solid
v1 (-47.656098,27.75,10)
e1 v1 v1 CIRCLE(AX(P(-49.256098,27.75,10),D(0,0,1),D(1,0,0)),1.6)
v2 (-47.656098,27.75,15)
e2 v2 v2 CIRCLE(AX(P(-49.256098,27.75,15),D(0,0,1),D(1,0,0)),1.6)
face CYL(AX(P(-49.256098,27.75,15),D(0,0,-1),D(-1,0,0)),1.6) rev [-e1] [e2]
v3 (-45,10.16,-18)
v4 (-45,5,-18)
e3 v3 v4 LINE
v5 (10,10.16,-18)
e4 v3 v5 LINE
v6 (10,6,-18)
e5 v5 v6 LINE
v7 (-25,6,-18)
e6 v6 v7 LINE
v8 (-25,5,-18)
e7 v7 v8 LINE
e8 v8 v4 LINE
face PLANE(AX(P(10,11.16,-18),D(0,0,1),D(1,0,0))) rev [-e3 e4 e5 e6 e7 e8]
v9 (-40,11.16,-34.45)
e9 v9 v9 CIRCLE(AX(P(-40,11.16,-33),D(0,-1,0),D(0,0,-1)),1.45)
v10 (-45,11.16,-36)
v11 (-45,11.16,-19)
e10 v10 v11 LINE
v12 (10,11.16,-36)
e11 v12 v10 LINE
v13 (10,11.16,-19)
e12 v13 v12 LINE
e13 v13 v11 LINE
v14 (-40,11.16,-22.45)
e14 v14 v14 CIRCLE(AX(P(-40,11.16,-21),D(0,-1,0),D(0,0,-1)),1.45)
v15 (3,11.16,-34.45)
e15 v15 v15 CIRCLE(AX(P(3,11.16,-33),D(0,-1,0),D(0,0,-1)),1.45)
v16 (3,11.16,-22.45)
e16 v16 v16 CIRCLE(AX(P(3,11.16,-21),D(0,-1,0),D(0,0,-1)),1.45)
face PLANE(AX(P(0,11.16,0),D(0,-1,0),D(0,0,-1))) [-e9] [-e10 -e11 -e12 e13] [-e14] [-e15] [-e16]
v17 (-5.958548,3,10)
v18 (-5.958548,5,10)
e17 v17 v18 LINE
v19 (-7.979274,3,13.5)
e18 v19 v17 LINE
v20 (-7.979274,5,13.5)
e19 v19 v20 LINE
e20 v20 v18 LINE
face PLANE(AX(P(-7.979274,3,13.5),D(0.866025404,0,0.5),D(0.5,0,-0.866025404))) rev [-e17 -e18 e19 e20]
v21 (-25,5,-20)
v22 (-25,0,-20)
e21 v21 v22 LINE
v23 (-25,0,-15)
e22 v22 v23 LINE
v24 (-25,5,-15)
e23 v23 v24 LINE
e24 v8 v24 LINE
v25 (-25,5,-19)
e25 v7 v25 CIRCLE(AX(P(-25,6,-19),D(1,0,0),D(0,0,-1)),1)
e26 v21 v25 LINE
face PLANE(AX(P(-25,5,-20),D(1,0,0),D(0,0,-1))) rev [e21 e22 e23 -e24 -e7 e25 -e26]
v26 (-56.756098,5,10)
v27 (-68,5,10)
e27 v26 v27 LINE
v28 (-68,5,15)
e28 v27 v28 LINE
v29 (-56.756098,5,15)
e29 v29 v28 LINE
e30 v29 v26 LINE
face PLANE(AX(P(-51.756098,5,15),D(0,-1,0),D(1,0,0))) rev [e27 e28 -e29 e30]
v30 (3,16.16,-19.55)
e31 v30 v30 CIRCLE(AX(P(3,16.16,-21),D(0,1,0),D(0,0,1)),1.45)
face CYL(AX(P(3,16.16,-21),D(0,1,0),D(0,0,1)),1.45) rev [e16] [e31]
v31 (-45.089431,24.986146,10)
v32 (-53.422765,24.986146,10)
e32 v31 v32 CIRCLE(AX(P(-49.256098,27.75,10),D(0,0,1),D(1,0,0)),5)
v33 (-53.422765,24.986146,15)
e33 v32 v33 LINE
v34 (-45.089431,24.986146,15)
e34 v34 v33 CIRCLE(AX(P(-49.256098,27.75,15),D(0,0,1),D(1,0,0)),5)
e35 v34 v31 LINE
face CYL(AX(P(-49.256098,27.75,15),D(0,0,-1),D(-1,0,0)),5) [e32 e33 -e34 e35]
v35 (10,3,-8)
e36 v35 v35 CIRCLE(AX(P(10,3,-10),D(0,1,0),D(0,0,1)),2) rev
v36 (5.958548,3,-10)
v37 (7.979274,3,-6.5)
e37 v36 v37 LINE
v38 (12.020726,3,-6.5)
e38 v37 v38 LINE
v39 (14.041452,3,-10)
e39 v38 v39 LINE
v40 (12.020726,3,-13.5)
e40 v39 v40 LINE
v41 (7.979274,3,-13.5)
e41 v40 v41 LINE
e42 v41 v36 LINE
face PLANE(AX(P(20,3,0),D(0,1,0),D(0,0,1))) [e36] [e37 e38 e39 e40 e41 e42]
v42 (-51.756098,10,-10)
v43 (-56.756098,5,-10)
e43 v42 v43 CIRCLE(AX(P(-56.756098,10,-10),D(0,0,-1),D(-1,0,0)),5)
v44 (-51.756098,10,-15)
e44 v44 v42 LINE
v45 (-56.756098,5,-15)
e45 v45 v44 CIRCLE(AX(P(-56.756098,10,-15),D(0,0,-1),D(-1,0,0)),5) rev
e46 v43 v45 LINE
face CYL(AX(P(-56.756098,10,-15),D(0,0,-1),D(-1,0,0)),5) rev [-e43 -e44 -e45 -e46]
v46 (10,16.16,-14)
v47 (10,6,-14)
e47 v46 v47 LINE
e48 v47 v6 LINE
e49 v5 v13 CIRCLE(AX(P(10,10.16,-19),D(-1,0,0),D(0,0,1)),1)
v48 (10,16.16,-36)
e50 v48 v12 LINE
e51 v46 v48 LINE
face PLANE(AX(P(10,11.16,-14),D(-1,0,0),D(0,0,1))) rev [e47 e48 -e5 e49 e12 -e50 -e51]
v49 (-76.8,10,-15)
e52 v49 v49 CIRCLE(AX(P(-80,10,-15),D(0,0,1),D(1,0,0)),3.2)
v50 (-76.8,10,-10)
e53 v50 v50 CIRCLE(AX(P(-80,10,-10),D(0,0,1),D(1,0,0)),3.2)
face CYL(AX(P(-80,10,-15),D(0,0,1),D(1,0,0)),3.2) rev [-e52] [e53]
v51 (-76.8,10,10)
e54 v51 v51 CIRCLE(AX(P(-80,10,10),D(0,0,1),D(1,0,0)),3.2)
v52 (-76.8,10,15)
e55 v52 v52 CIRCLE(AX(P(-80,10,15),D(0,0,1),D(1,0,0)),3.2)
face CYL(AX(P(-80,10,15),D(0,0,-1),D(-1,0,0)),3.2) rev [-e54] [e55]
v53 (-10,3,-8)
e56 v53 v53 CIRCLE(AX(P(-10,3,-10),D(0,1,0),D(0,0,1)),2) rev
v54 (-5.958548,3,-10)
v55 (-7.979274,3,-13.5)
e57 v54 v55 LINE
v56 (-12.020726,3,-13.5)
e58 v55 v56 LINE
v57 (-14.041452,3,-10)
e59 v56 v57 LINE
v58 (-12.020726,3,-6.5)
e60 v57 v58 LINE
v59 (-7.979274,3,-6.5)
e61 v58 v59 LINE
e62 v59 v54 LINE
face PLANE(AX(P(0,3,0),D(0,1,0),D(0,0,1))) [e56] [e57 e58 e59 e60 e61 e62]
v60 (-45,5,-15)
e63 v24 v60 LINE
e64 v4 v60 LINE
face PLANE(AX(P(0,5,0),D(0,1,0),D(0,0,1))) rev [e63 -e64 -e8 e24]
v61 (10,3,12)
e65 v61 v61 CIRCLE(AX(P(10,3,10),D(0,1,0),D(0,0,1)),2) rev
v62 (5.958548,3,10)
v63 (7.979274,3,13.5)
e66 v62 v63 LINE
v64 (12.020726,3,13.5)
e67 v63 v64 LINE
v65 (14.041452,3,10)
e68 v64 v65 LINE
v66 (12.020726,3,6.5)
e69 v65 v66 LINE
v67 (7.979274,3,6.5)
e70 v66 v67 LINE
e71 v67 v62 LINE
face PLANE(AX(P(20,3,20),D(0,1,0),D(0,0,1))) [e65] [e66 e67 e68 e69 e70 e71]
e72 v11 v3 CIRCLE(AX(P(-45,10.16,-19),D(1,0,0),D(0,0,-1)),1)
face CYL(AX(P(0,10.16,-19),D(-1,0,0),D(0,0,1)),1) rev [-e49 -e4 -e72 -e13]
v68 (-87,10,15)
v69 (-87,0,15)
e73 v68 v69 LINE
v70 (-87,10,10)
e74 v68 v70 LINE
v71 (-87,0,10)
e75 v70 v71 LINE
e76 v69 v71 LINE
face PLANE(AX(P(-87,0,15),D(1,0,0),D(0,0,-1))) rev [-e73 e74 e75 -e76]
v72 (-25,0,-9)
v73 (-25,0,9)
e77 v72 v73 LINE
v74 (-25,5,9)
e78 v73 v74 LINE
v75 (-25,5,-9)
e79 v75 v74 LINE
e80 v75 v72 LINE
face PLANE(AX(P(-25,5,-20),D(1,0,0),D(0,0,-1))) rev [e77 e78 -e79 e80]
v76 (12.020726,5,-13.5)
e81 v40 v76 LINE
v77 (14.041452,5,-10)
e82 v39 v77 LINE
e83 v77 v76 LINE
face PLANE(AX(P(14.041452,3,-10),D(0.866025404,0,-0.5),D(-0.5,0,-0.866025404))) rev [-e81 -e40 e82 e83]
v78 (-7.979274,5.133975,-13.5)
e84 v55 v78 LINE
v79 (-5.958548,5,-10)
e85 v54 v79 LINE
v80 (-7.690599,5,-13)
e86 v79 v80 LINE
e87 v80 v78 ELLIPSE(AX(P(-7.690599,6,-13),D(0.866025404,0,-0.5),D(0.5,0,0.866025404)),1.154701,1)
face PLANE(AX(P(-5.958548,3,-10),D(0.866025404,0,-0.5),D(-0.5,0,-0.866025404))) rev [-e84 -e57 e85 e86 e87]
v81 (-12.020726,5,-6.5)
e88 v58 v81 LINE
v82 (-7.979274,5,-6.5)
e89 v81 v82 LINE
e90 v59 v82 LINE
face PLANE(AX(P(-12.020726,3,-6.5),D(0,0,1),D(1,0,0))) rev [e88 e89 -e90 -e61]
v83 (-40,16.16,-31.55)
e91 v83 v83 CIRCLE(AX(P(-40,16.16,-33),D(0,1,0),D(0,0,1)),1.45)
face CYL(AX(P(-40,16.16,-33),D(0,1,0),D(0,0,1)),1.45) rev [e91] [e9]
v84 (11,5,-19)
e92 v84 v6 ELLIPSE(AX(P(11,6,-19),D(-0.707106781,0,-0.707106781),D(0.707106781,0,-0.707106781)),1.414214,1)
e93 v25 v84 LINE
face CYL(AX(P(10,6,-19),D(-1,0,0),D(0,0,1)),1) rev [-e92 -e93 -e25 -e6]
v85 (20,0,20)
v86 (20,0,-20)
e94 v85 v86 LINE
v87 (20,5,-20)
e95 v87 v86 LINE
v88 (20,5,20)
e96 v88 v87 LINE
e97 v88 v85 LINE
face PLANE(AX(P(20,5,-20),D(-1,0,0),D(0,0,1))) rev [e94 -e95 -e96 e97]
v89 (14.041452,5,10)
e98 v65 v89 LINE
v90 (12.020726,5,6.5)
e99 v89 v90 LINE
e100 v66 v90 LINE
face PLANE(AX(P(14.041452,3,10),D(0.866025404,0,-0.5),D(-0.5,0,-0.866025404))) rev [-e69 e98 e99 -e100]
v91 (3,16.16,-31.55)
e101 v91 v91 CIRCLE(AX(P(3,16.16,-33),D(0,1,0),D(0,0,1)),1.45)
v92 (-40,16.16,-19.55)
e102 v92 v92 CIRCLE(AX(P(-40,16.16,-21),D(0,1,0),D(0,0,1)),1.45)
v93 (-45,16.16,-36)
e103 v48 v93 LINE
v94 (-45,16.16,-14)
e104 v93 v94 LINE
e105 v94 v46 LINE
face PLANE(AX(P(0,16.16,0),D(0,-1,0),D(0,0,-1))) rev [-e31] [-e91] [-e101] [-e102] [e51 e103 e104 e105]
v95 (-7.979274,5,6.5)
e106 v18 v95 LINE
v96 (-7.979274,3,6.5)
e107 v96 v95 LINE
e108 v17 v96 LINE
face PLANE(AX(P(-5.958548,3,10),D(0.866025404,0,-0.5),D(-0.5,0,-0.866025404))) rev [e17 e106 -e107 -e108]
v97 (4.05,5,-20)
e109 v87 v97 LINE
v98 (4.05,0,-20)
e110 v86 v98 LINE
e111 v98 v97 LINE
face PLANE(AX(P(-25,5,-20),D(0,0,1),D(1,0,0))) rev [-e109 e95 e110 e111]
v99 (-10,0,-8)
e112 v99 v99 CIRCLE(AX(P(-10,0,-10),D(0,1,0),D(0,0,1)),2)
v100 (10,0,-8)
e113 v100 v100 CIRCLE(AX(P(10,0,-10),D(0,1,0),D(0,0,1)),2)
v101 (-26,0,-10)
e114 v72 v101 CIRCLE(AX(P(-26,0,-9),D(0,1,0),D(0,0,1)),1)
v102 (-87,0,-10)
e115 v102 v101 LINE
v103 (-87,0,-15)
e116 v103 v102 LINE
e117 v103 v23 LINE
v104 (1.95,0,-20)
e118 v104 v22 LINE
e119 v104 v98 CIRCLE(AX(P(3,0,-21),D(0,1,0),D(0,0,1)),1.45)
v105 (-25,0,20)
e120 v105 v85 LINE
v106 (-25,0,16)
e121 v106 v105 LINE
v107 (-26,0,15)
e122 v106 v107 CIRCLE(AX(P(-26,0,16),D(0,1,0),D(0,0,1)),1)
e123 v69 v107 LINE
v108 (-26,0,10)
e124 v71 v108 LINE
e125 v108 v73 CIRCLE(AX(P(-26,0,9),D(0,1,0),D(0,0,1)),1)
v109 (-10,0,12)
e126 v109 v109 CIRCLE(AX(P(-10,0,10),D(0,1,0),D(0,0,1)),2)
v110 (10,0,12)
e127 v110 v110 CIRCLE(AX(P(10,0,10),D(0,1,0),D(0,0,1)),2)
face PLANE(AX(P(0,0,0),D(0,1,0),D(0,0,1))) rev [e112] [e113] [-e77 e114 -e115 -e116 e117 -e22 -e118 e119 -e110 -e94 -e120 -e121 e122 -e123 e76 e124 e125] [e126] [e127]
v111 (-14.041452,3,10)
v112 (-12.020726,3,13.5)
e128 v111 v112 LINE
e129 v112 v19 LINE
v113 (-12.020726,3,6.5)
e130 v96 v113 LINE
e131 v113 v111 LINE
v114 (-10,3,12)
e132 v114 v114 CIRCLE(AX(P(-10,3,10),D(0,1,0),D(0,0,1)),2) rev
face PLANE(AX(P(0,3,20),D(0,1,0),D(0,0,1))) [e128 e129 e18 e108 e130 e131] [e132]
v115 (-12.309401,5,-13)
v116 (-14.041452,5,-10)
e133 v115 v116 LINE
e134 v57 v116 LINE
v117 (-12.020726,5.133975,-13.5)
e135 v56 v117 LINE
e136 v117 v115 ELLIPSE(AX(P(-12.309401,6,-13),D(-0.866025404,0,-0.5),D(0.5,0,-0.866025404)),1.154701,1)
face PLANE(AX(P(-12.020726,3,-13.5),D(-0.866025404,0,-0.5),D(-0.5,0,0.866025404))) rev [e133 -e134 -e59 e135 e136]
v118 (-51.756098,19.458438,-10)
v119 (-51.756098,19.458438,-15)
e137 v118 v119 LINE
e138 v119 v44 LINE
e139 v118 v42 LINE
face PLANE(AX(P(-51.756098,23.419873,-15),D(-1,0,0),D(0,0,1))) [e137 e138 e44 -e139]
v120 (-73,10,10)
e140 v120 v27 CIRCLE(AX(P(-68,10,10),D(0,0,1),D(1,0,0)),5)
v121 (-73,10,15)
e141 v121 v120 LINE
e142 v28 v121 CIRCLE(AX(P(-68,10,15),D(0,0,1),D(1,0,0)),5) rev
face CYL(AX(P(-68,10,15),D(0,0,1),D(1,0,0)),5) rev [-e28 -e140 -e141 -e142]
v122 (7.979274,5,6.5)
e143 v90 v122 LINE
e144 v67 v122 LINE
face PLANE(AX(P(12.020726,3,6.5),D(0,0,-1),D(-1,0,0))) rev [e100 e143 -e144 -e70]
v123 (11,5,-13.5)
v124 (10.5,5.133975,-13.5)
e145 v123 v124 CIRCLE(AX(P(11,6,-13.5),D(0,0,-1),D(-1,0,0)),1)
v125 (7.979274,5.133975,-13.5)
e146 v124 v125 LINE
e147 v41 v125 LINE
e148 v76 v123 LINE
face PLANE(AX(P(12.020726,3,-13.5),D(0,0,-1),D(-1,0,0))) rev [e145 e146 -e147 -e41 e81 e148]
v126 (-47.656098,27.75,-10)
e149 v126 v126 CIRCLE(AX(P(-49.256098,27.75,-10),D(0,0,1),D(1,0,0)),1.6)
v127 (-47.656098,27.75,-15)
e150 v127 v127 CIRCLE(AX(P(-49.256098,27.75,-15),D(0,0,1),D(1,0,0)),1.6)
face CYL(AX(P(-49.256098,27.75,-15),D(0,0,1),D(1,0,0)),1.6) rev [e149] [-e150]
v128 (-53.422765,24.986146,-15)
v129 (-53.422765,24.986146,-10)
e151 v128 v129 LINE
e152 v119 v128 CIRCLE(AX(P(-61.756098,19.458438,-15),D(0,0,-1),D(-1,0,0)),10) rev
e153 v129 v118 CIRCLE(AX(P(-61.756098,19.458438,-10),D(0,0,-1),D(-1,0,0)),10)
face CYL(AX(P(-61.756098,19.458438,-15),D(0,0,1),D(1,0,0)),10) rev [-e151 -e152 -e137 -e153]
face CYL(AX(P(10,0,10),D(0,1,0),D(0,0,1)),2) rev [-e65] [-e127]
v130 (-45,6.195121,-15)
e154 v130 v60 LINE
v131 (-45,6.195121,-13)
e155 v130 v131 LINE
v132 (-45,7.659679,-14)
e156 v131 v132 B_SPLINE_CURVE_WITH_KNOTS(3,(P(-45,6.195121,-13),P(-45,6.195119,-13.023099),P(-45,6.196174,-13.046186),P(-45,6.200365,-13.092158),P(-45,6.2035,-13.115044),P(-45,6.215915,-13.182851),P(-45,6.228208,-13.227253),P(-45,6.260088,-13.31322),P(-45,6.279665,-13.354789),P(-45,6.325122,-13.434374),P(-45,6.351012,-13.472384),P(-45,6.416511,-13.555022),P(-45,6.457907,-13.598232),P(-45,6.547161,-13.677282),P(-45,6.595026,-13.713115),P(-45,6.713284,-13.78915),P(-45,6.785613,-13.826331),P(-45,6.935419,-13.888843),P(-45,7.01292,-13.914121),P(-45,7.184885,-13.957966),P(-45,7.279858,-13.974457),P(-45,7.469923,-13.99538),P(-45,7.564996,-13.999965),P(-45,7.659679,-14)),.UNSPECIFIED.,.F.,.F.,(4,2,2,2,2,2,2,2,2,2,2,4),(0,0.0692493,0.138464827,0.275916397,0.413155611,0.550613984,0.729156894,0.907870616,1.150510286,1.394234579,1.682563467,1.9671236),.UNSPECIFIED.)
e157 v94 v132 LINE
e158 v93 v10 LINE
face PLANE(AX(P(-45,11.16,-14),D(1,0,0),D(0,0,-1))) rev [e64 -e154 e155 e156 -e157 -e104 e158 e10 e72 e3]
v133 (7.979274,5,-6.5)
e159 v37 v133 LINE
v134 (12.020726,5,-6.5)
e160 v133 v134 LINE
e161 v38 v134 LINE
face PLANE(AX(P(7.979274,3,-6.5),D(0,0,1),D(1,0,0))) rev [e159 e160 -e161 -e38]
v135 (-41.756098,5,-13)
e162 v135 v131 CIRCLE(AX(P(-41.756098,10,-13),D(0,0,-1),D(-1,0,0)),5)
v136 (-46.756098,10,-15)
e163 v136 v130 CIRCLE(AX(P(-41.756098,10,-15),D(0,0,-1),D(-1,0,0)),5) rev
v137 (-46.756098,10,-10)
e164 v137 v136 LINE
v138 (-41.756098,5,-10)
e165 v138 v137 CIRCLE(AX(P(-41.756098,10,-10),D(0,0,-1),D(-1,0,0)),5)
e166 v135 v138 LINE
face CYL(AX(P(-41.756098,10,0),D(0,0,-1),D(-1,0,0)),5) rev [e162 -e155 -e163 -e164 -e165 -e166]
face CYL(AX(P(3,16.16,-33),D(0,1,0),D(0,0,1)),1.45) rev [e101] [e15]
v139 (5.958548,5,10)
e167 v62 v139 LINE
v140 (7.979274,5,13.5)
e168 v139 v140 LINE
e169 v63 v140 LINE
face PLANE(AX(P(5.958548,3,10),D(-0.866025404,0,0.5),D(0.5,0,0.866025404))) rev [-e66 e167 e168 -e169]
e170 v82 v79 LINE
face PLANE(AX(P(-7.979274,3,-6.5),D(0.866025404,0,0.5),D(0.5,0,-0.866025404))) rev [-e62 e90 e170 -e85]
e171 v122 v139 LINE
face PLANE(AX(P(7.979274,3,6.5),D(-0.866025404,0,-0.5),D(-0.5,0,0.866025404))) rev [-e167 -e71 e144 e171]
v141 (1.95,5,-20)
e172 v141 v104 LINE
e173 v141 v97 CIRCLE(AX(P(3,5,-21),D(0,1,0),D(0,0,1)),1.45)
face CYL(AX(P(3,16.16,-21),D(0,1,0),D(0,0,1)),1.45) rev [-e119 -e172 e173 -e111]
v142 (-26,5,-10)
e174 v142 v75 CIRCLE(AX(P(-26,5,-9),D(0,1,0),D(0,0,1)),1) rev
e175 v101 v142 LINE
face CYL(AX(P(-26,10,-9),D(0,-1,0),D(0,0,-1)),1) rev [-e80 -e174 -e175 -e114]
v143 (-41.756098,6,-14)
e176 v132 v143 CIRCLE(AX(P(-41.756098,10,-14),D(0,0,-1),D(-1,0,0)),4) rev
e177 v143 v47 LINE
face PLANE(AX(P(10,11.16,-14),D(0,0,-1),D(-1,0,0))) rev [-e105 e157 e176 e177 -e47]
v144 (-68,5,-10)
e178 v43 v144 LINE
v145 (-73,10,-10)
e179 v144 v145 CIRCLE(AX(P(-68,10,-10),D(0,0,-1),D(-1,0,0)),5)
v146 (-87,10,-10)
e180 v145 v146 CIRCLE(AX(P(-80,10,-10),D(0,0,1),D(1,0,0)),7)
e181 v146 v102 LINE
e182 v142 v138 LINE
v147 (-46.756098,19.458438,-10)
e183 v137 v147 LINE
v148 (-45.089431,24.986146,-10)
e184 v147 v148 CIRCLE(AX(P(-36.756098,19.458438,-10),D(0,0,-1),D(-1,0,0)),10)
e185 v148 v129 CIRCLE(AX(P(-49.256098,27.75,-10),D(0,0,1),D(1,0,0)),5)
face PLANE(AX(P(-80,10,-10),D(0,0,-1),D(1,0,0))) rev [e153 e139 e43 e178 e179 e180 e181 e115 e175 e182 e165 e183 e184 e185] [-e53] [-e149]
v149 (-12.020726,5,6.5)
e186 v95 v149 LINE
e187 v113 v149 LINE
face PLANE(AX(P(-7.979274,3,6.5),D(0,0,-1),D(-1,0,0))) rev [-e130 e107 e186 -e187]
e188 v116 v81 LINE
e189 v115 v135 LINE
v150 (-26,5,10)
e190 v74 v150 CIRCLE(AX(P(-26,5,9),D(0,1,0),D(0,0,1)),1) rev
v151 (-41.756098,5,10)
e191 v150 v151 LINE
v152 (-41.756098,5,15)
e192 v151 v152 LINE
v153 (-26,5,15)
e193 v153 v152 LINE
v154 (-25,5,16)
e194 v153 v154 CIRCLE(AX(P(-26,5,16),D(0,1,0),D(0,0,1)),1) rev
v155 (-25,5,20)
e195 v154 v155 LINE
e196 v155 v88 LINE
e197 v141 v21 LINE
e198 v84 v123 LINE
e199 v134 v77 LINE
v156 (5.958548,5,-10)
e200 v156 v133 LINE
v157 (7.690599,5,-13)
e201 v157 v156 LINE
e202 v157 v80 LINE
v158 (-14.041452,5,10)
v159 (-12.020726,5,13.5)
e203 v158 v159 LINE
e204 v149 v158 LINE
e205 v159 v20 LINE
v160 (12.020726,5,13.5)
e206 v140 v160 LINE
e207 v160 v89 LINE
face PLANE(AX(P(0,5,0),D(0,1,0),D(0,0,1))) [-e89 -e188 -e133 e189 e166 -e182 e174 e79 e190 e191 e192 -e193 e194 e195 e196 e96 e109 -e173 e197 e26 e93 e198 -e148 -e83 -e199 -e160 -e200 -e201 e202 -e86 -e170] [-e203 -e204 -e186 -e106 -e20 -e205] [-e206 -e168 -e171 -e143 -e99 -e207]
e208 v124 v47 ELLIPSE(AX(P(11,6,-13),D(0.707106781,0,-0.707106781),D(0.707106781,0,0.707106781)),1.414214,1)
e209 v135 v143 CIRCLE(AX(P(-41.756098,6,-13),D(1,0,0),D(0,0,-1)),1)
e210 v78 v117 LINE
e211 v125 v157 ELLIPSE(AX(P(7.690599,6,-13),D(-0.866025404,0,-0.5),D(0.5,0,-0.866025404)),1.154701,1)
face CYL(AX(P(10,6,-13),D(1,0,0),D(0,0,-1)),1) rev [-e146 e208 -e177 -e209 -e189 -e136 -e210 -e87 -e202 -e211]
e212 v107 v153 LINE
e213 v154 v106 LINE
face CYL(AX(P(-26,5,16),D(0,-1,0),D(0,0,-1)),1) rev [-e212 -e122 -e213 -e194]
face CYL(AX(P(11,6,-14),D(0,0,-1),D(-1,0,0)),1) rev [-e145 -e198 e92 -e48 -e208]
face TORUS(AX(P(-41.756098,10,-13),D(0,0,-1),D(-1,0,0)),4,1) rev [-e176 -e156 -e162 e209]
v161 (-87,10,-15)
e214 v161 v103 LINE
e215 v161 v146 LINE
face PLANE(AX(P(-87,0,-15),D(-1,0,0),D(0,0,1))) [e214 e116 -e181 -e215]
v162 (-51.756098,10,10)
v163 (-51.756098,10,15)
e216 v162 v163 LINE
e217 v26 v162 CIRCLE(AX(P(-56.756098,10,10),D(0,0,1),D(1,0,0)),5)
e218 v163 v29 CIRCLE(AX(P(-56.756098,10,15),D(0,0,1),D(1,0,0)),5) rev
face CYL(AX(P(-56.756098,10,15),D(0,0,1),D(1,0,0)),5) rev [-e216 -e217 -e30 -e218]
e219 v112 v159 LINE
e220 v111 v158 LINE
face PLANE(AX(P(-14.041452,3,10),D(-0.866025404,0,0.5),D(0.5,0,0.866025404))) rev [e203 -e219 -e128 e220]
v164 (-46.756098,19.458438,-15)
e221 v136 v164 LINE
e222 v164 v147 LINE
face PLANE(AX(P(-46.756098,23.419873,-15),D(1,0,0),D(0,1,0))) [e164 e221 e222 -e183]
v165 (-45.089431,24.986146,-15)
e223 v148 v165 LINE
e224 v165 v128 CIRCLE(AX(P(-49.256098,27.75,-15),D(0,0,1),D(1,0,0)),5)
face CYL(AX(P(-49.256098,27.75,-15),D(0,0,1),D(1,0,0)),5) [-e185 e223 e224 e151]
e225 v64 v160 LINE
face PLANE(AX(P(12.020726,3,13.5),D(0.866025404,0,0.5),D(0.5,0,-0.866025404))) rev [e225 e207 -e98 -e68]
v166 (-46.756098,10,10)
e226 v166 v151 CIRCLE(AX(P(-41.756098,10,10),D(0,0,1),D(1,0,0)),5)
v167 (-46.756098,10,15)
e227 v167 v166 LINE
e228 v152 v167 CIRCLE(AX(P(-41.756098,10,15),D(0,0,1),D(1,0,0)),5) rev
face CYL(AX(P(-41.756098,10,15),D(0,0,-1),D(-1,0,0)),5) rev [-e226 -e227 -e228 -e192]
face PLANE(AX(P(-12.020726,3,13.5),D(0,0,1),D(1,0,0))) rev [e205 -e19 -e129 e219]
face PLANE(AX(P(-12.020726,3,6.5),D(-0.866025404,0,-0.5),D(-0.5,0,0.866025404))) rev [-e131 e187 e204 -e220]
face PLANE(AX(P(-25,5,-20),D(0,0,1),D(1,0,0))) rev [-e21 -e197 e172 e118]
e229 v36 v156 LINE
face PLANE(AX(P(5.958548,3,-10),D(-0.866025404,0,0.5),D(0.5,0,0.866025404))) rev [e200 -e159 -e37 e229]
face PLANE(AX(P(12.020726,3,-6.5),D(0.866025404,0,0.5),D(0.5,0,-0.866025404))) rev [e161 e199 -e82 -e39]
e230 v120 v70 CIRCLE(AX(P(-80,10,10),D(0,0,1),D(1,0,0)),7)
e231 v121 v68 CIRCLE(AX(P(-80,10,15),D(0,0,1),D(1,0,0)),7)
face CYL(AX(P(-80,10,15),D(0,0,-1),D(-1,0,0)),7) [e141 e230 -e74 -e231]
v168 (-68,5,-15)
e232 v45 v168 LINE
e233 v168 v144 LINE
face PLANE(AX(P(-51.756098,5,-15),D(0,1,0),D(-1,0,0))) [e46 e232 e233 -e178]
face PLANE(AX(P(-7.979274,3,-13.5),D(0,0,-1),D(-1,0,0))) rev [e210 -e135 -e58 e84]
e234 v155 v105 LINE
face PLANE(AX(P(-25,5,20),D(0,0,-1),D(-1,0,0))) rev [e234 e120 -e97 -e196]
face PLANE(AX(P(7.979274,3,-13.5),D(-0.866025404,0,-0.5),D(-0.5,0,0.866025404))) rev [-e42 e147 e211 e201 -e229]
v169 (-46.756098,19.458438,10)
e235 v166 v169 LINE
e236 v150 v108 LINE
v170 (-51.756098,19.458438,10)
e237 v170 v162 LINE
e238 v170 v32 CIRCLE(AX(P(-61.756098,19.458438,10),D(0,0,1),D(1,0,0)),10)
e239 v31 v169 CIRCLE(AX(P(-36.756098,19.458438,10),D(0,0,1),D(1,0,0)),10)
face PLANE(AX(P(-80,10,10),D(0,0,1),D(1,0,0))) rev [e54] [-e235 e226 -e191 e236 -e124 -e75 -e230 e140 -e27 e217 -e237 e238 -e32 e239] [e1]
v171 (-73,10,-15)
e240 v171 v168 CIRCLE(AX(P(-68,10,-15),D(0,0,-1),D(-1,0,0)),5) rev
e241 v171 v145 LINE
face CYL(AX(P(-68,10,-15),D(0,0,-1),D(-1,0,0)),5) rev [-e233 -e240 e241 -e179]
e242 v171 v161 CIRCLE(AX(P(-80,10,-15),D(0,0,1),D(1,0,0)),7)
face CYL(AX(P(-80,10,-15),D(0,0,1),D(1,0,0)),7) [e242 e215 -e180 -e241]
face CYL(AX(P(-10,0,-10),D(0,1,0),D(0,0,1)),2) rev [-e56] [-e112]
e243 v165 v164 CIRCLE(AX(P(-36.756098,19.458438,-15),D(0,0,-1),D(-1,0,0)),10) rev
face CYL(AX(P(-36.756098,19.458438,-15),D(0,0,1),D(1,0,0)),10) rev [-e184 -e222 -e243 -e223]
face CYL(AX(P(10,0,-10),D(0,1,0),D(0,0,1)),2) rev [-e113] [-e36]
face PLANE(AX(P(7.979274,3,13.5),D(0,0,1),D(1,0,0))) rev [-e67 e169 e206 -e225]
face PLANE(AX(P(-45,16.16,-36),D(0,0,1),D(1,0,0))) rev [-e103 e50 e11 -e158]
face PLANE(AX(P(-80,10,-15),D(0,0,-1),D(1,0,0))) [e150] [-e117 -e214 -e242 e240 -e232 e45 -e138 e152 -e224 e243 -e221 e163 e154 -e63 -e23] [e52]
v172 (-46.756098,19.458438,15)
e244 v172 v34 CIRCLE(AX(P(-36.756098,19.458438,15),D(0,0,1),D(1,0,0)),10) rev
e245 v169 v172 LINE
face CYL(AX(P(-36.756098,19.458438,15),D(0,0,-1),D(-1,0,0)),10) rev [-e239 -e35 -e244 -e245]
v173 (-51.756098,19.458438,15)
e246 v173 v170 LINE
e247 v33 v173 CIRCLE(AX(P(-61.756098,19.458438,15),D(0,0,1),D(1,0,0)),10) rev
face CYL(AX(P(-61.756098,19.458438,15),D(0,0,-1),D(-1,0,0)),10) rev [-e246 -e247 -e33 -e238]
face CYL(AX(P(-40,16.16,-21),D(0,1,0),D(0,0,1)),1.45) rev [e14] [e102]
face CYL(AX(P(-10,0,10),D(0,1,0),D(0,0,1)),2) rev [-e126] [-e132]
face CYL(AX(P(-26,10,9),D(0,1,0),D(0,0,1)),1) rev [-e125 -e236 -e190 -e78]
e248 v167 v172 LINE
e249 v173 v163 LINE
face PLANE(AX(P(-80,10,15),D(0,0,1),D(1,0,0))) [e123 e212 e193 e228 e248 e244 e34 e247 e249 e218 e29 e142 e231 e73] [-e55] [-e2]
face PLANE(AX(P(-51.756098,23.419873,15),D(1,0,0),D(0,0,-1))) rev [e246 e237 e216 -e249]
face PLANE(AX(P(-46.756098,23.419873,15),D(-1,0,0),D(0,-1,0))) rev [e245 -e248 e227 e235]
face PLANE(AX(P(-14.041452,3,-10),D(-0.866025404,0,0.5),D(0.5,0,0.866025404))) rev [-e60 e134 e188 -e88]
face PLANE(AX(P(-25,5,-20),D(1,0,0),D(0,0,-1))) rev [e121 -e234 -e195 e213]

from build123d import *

# Parameters (mm, degrees)
SKETCH1_W                        = 45
SKETCH1_H                        = 40
CONNECTION_BASE_DEPTH            = 5
SKETCH9_R                        = 3.2
SKETCH9_R_2                      = 1.6
LEFT_LEG_DEPTH                   = 5
LEG_FILLET_R                     = 5
HUB_FILLET_R                     = 10
LEG_FILLET_OF_MIRROR_RIGHT_LEG_R = 5
HUB_FILLET_OF_MIRROR_RIGHT_LEG_R = 10
SKETCH2_R                        = 2
BASE_CONN_HOLE_DEPTH             = 94.482952991
BASE_CONN_NUT_DEPTH              = 2
BASE_HOLES_PATTERN_COUNT         = 2
BASE_HOLES_PATTERN_PITCH         = 20
BASE_HOLES_PATTERN_COUNT_DIR2    = 2
BASE_HOLES_PATTERN_PITCH_DIR2    = 20
SKETCH4_W                        = 55
SKETCH4_H                        = 4
MOTOR_STEP_DEPTH                 = 6.16
SKETCH5_W                        = 55
SKETCH5_H                        = 22
MOTOR_SHELF_DEPTH                = 5
MOTOR_M3_5X0_6_TAPPED_HOLE1_D    = 2.9
SMALL_INTERNAL_FILLETS_R         = 1


# Some blends are built 0.0001 mm under size
with BuildPart() as part:
    # Sketch1 → Connection_Base (new body)
    with BuildSketch(Plane(origin=(0, 0, 0), x_dir=(1, 0, 0), z_dir=(0, 1, 0))):
        with Locations((-2.5, 0)):
            Rectangle(SKETCH1_W, SKETCH1_H)
    extrude(amount=CONNECTION_BASE_DEPTH)

    # Sketch9 → LEFT_LEG (add)
    with BuildSketch(Plane.XY.offset(10)):
        with BuildLine():
            Line((-51.756098166, 5), (-73, 5))
            Line((-73, 5), (-73, 10))
            ThreePointArc((-73, 10), (-80, 17), (-87, 10))
            Line((-87, 10), (-87, 0))
            Line((-87, 0), (0, 0))
            Line((0, 0), (0, 5))
            Line((0, 5), (-46.756098166, 5))
            Line((-46.756098166, 5), (-46.756098166, 23.419872981))
            ThreePointArc((-46.756098166, 23.419872981), (-49.256098166, 32.75), (-51.756098166, 23.419872981))
            Line((-51.756098166, 23.419872981), (-51.756098166, 5))
        make_face()
        with Locations((-80, 10)):
            Circle(SKETCH9_R, mode=Mode.SUBTRACT)
        with Locations((-49.256098166, 27.75)):
            Circle(SKETCH9_R_2, mode=Mode.SUBTRACT)
    left_leg = extrude(amount=LEFT_LEG_DEPTH)

    # LEG_Fillet
    leg_fillet_edges = [part.edges().sort_by_distance(p)[0] for p in [
        (-51.756098166, 5, 12.5),
        (-46.756098166, 5, 12.5),
        (-73, 5, 12.5),
    ]]
    fillet(leg_fillet_edges, radius=LEG_FILLET_R - 0.0001)  # a hair under: the kernel refuses the full size

    # Hub_Fillet
    hub_fillet_edges = [part.edges().sort_by_distance(p)[0] for p in [
        (-46.756098166, 23.419872981, 12.5),
        (-51.756098166, 23.419872981, 12.5),
    ]]
    fillet(hub_fillet_edges, radius=HUB_FILLET_R)

    # Mirror_RIGHT_LEG: LEFT_LEG across plane
    add(left_leg.mirror(Plane.XY))

    # LEG_Fillet of Mirror_RIGHT_LEG
    leg_fillet_of_mirror_right_leg_edges = [part.edges().sort_by_distance(p)[0] for p in [
        (-51.756098166, 5, -12.5),
        (-46.756098166, 5, -12.5),
        (-73, 5, -12.5),
    ]]
    fillet(leg_fillet_of_mirror_right_leg_edges, radius=LEG_FILLET_OF_MIRROR_RIGHT_LEG_R - 0.0001)  # a hair under: the kernel refuses the full size

    # Hub_Fillet of Mirror_RIGHT_LEG
    hub_fillet_of_mirror_right_leg_edges = [part.edges().sort_by_distance(p)[0] for p in [
        (-46.756098166, 23.419872981, -12.5),
        (-51.756098166, 23.419872981, -12.5),
    ]]
    fillet(hub_fillet_of_mirror_right_leg_edges, radius=HUB_FILLET_OF_MIRROR_RIGHT_LEG_R)

    # Sketch2 → Base_Conn_Hole (cut, through all)
    with BuildSketch(Plane(origin=(0, 5, 0), x_dir=(1, 0, 0), z_dir=(0, 1, 0))):
        with Locations(Location((-10, 10, 0), (0, 0, 270))):
            Circle(SKETCH2_R)
    base_conn_hole = extrude(amount=-BASE_CONN_HOLE_DEPTH, mode=Mode.SUBTRACT)

    # Sketch3 → Base_Conn_Nut (cut)
    with BuildSketch(Plane(origin=(0, 5, 0), x_dir=(1, 0, 0), z_dir=(0, 1, 0))):
        Polygon((-7.979274058, 6.5), (-5.958548116, 10), (-7.979274058, 13.5), (-12.020725942, 13.5), (-14.041451884, 10), (-12.020725942, 6.5), align=None)
    base_conn_nut = extrude(amount=-BASE_CONN_NUT_DEPTH, mode=Mode.SUBTRACT)

    # Base_Holes_Pattern: Base_Conn_Hole, Base_Conn_Nut 2 × 2
    with Locations(*[(j * BASE_HOLES_PATTERN_PITCH_DIR2, 0, i * BASE_HOLES_PATTERN_PITCH) for i in range(BASE_HOLES_PATTERN_COUNT) for j in range(BASE_HOLES_PATTERN_COUNT_DIR2) if (i, j) != (0, 0)]):
        add(base_conn_hole, mode=Mode.SUBTRACT)
        add(base_conn_nut, mode=Mode.SUBTRACT)

    # Sketch4 → Motor_Step (add)
    with BuildSketch(Plane(origin=(0, 5, 0), x_dir=(1, 0, 0), z_dir=(0, 1, 0))):
        with Locations((-17.5, 16)):
            Rectangle(SKETCH4_W, SKETCH4_H)
    extrude(amount=MOTOR_STEP_DEPTH)

    # Sketch5 → Motor_Shelf (add)
    with BuildSketch(Plane(origin=(0, 11.16, 0), x_dir=(1, 0, 0), z_dir=(0, 1, 0))):
        with Locations((-17.5, 25)):
            Rectangle(SKETCH5_W, SKETCH5_H)
    extrude(amount=MOTOR_SHELF_DEPTH)

    # Motor_M3.5x0.6 Tapped Hole1 (through all)
    with Locations(Plane(origin=(0, 16.16, 0), x_dir=(1, 0, 0), z_dir=(0, 1, 0))):
        with Locations((3, 21), (3, 33), (-40, 33), (-40, 21)):
            Hole(MOTOR_M3_5X0_6_TAPPED_HOLE1_D / 2)

    # Small_Internal_Fillets
    # the kernel refuses this fillet: 1 mm, written as the material it adds along each edge
    with BuildSketch(Plane(origin=(-25, 0, 10), x_dir=(0, 0, -1), z_dir=(0, 1, 0)), Plane(origin=(-25, 0, 15), x_dir=(-1, 0, 0), z_dir=(0, 1, 0)), Plane(origin=(-25, 0, -10), x_dir=(-1, 0, 0), z_dir=(0, 1, 0))) as small_internal_fillets_piece_1:
        with BuildLine():
            CenterArc((SMALL_INTERNAL_FILLETS_R, SMALL_INTERNAL_FILLETS_R), SMALL_INTERNAL_FILLETS_R, 180, 90)
            Line((0, SMALL_INTERNAL_FILLETS_R), (0, 0))
            Line((0, 0), (SMALL_INTERNAL_FILLETS_R, 0))
        make_face()
    extrude(amount=5)
    with BuildSketch(Plane(origin=(-41.756198166, 9.9999, -14), x_dir=(0, -1, 0), z_dir=(1, 0, 0))) as small_internal_fillets_piece_2_section:
        with BuildLine():
            CenterArc((4.9999 - SMALL_INTERNAL_FILLETS_R, -SMALL_INTERNAL_FILLETS_R), SMALL_INTERNAL_FILLETS_R, 0, 90)
            Line((4.9999 - SMALL_INTERNAL_FILLETS_R, 0), (4.9999, 0))
            Line((4.9999, 0), (4.9999, -SMALL_INTERNAL_FILLETS_R))
        make_face()
    small_internal_fillets_piece_2 = revolve(axis=Axis((-41.756198166, 9.9999, -14), (0, 0, -1)), revolution_arc=69.099967659, mode=Mode.PRIVATE)
    small_internal_fillets_piece_2 = split(small_internal_fillets_piece_2, bisect_by=Plane(origin=(-45, 9.9999, -14), z_dir=(1, 0, 0)), keep=Keep.TOP, mode=Mode.PRIVATE)
    add(small_internal_fillets_piece_2)
    with BuildSketch(Plane(origin=(10, 5, -14), x_dir=(0, 0, 1), z_dir=(-1, 0, 0))) as small_internal_fillets_piece_3_section:
        with BuildLine():
            CenterArc((SMALL_INTERNAL_FILLETS_R, SMALL_INTERNAL_FILLETS_R), SMALL_INTERNAL_FILLETS_R, 180, 90)
            Line((0, SMALL_INTERNAL_FILLETS_R), (0, 0))
            Line((0, 0), (SMALL_INTERNAL_FILLETS_R, 0))
        make_face()
    small_internal_fillets_piece_3 = extrude(amount=51.756198166, mode=Mode.PRIVATE)
    small_internal_fillets_piece_3 = split(small_internal_fillets_piece_3, bisect_by=Plane(origin=(10, 5, -13.5), z_dir=(0, 0, -1)), keep=Keep.TOP, mode=Mode.PRIVATE)
    add(small_internal_fillets_piece_3)
    with BuildSketch(Plane(origin=(12.5, 5, -14), x_dir=(0, 0, 1), z_dir=(-1, 0, 0))) as small_internal_fillets_piece_4_section:
        with BuildLine():
            CenterArc((SMALL_INTERNAL_FILLETS_R, SMALL_INTERNAL_FILLETS_R), SMALL_INTERNAL_FILLETS_R, 180, 90)
            Line((0, SMALL_INTERNAL_FILLETS_R), (0, 0))
            Line((0, 0), (SMALL_INTERNAL_FILLETS_R, 0))
        make_face()
    small_internal_fillets_piece_4 = extrude(amount=54.256198166, mode=Mode.PRIVATE)
    small_internal_fillets_piece_4 = split(small_internal_fillets_piece_4, bisect_by=Plane(origin=(9.325961894, 5, -15.832531755), z_dir=(-0.8660254037844387, 0, -0.4999999999999999)), keep=Keep.TOP, mode=Mode.PRIVATE)
    small_internal_fillets_piece_4 = split(small_internal_fillets_piece_4, bisect_by=Plane(origin=(-3.075961894, 5, -5.007214207), z_dir=(0.8660254037844389, 0, -0.4999999999999996)), keep=Keep.TOP, mode=Mode.PRIVATE)
    add(small_internal_fillets_piece_4)
    with BuildSketch(Plane(origin=(12.5, 5, -14), x_dir=(0, 0, 1), z_dir=(-1, 0, 0))) as small_internal_fillets_piece_5_section:
        with BuildLine():
            CenterArc((SMALL_INTERNAL_FILLETS_R, SMALL_INTERNAL_FILLETS_R), SMALL_INTERNAL_FILLETS_R, 180, 90)
            Line((0, SMALL_INTERNAL_FILLETS_R), (0, 0))
            Line((0, 0), (SMALL_INTERNAL_FILLETS_R, 0))
        make_face()
    small_internal_fillets_piece_5 = extrude(amount=54.256198166, mode=Mode.PRIVATE)
    small_internal_fillets_piece_5 = split(small_internal_fillets_piece_5, bisect_by=Plane(origin=(-5.674038106, 5, -24.492785793), z_dir=(-0.8660254037844387, 0, -0.4999999999999999)), keep=Keep.TOP, mode=Mode.PRIVATE)
    add(small_internal_fillets_piece_5)
    with BuildSketch(Plane(origin=(10, 5, -18), x_dir=(1, 0, 0), z_dir=(0, 0, 1))) as small_internal_fillets_piece_6:
        with BuildLine():
            CenterArc((SMALL_INTERNAL_FILLETS_R, SMALL_INTERNAL_FILLETS_R), SMALL_INTERNAL_FILLETS_R, 180, 90)
            Line((0, SMALL_INTERNAL_FILLETS_R), (0, 0))
            Line((0, 0), (SMALL_INTERNAL_FILLETS_R, 0))
        make_face()
    extrude(amount=4)
    with BuildSketch(Plane(origin=(-25, 5, -18), x_dir=(0, 0, -1), z_dir=(1, 0, 0))) as small_internal_fillets_piece_7:
        with BuildLine():
            CenterArc((SMALL_INTERNAL_FILLETS_R, SMALL_INTERNAL_FILLETS_R), SMALL_INTERNAL_FILLETS_R, 180, 90)
            Line((0, SMALL_INTERNAL_FILLETS_R), (0, 0))
            Line((0, 0), (SMALL_INTERNAL_FILLETS_R, 0))
        make_face()
    extrude(amount=35)
    with BuildSketch(Plane(origin=(-45, 11.16, -18), x_dir=(0, -1, 0), z_dir=(1, 0, 0))) as small_internal_fillets_piece_8:
        with BuildLine():
            CenterArc((SMALL_INTERNAL_FILLETS_R, SMALL_INTERNAL_FILLETS_R), SMALL_INTERNAL_FILLETS_R, 180, 90)
            Line((0, SMALL_INTERNAL_FILLETS_R), (0, 0))
            Line((0, 0), (SMALL_INTERNAL_FILLETS_R, 0))
        make_face()
    extrude(amount=55)
    with BuildSketch(Plane(origin=(10, 5, -18), x_dir=(1, 0, 0), z_dir=(0, 0, 1))) as small_internal_fillets_piece_9a_section:
        with BuildLine():
            CenterArc((SMALL_INTERNAL_FILLETS_R, SMALL_INTERNAL_FILLETS_R), SMALL_INTERNAL_FILLETS_R, 180, 90)
            Line((0, SMALL_INTERNAL_FILLETS_R), (0, 0))
            Line((0, 0), (SMALL_INTERNAL_FILLETS_R, 0))
        make_face()
    small_internal_fillets_piece_9a = extrude(amount=6.5, mode=Mode.PRIVATE)
    small_internal_fillets_piece_9a = split(small_internal_fillets_piece_9a, bisect_by=Plane(origin=(10, 5, -14), z_dir=(0, 0, 1)), keep=Keep.TOP, mode=Mode.PRIVATE)
    small_internal_fillets_piece_9a = split(small_internal_fillets_piece_9a, bisect_by=Plane(origin=(10, 5, -13.5), z_dir=(0, 0, -1)), keep=Keep.TOP, mode=Mode.PRIVATE)
    with BuildSketch(Plane(origin=(12.5, 5, -14), x_dir=(0, 0, 1), z_dir=(-1, 0, 0))) as small_internal_fillets_piece_9b_section:
        with BuildLine():
            CenterArc((SMALL_INTERNAL_FILLETS_R, SMALL_INTERNAL_FILLETS_R), SMALL_INTERNAL_FILLETS_R, 180, 90)
            Line((0, SMALL_INTERNAL_FILLETS_R), (0, 0))
            Line((0, 0), (SMALL_INTERNAL_FILLETS_R, 0))
        make_face()
    small_internal_fillets_piece_9b = extrude(amount=54.256198166, mode=Mode.PRIVATE)
    small_internal_fillets_piece_9b = split(small_internal_fillets_piece_9b, bisect_by=Plane(origin=(10, 5, -14), z_dir=(1, 0, 0)), keep=Keep.TOP, mode=Mode.PRIVATE)
    small_internal_fillets_piece_9b = split(small_internal_fillets_piece_9b, bisect_by=Plane(origin=(11.924038106, 5, -13.667468245), z_dir=(-0.8660254037844389, 0, 0.4999999999999996)), keep=Keep.TOP, mode=Mode.PRIVATE)
    small_internal_fillets_piece_9b = split(small_internal_fillets_piece_9b, bisect_by=Plane(origin=(12.5, 5, -13.5), z_dir=(0, 0, -1)), keep=Keep.TOP, mode=Mode.PRIVATE)
    small_internal_fillets_piece_9 = small_internal_fillets_piece_9a & small_internal_fillets_piece_9b
    add(small_internal_fillets_piece_9)
    with BuildSketch(Plane(origin=(-25, 5, -18), x_dir=(0, 0, -1), z_dir=(1, 0, 0))) as small_internal_fillets_piece_10a_section:
        with BuildLine():
            CenterArc((SMALL_INTERNAL_FILLETS_R, SMALL_INTERNAL_FILLETS_R), SMALL_INTERNAL_FILLETS_R, 180, 90)
            Line((0, SMALL_INTERNAL_FILLETS_R), (0, 0))
            Line((0, 0), (SMALL_INTERNAL_FILLETS_R, 0))
        make_face()
    small_internal_fillets_piece_10a = extrude(amount=37.5, mode=Mode.PRIVATE)
    small_internal_fillets_piece_10a = split(small_internal_fillets_piece_10a, bisect_by=Plane(origin=(10, 5, -18), z_dir=(1, 0, 0)), keep=Keep.TOP, mode=Mode.PRIVATE)
    with BuildSketch(Plane(origin=(10, 5, -20.5), x_dir=(1, 0, 0), z_dir=(0, 0, 1))) as small_internal_fillets_piece_10b_section:
        with BuildLine():
            CenterArc((SMALL_INTERNAL_FILLETS_R, SMALL_INTERNAL_FILLETS_R), SMALL_INTERNAL_FILLETS_R, 180, 90)
            Line((0, SMALL_INTERNAL_FILLETS_R), (0, 0))
            Line((0, 0), (SMALL_INTERNAL_FILLETS_R, 0))
        make_face()
    small_internal_fillets_piece_10b = extrude(amount=6.5, mode=Mode.PRIVATE)
    small_internal_fillets_piece_10b = split(small_internal_fillets_piece_10b, bisect_by=Plane(origin=(10, 5, -20), z_dir=(0, 0, 1)), keep=Keep.TOP, mode=Mode.PRIVATE)
    small_internal_fillets_piece_10b = split(small_internal_fillets_piece_10b, bisect_by=Plane(origin=(10, 5, -18), z_dir=(0, 0, -1)), keep=Keep.TOP, mode=Mode.PRIVATE)
    small_internal_fillets_piece_10 = small_internal_fillets_piece_10a & small_internal_fillets_piece_10b
    add(small_internal_fillets_piece_10)


solid = part.part
